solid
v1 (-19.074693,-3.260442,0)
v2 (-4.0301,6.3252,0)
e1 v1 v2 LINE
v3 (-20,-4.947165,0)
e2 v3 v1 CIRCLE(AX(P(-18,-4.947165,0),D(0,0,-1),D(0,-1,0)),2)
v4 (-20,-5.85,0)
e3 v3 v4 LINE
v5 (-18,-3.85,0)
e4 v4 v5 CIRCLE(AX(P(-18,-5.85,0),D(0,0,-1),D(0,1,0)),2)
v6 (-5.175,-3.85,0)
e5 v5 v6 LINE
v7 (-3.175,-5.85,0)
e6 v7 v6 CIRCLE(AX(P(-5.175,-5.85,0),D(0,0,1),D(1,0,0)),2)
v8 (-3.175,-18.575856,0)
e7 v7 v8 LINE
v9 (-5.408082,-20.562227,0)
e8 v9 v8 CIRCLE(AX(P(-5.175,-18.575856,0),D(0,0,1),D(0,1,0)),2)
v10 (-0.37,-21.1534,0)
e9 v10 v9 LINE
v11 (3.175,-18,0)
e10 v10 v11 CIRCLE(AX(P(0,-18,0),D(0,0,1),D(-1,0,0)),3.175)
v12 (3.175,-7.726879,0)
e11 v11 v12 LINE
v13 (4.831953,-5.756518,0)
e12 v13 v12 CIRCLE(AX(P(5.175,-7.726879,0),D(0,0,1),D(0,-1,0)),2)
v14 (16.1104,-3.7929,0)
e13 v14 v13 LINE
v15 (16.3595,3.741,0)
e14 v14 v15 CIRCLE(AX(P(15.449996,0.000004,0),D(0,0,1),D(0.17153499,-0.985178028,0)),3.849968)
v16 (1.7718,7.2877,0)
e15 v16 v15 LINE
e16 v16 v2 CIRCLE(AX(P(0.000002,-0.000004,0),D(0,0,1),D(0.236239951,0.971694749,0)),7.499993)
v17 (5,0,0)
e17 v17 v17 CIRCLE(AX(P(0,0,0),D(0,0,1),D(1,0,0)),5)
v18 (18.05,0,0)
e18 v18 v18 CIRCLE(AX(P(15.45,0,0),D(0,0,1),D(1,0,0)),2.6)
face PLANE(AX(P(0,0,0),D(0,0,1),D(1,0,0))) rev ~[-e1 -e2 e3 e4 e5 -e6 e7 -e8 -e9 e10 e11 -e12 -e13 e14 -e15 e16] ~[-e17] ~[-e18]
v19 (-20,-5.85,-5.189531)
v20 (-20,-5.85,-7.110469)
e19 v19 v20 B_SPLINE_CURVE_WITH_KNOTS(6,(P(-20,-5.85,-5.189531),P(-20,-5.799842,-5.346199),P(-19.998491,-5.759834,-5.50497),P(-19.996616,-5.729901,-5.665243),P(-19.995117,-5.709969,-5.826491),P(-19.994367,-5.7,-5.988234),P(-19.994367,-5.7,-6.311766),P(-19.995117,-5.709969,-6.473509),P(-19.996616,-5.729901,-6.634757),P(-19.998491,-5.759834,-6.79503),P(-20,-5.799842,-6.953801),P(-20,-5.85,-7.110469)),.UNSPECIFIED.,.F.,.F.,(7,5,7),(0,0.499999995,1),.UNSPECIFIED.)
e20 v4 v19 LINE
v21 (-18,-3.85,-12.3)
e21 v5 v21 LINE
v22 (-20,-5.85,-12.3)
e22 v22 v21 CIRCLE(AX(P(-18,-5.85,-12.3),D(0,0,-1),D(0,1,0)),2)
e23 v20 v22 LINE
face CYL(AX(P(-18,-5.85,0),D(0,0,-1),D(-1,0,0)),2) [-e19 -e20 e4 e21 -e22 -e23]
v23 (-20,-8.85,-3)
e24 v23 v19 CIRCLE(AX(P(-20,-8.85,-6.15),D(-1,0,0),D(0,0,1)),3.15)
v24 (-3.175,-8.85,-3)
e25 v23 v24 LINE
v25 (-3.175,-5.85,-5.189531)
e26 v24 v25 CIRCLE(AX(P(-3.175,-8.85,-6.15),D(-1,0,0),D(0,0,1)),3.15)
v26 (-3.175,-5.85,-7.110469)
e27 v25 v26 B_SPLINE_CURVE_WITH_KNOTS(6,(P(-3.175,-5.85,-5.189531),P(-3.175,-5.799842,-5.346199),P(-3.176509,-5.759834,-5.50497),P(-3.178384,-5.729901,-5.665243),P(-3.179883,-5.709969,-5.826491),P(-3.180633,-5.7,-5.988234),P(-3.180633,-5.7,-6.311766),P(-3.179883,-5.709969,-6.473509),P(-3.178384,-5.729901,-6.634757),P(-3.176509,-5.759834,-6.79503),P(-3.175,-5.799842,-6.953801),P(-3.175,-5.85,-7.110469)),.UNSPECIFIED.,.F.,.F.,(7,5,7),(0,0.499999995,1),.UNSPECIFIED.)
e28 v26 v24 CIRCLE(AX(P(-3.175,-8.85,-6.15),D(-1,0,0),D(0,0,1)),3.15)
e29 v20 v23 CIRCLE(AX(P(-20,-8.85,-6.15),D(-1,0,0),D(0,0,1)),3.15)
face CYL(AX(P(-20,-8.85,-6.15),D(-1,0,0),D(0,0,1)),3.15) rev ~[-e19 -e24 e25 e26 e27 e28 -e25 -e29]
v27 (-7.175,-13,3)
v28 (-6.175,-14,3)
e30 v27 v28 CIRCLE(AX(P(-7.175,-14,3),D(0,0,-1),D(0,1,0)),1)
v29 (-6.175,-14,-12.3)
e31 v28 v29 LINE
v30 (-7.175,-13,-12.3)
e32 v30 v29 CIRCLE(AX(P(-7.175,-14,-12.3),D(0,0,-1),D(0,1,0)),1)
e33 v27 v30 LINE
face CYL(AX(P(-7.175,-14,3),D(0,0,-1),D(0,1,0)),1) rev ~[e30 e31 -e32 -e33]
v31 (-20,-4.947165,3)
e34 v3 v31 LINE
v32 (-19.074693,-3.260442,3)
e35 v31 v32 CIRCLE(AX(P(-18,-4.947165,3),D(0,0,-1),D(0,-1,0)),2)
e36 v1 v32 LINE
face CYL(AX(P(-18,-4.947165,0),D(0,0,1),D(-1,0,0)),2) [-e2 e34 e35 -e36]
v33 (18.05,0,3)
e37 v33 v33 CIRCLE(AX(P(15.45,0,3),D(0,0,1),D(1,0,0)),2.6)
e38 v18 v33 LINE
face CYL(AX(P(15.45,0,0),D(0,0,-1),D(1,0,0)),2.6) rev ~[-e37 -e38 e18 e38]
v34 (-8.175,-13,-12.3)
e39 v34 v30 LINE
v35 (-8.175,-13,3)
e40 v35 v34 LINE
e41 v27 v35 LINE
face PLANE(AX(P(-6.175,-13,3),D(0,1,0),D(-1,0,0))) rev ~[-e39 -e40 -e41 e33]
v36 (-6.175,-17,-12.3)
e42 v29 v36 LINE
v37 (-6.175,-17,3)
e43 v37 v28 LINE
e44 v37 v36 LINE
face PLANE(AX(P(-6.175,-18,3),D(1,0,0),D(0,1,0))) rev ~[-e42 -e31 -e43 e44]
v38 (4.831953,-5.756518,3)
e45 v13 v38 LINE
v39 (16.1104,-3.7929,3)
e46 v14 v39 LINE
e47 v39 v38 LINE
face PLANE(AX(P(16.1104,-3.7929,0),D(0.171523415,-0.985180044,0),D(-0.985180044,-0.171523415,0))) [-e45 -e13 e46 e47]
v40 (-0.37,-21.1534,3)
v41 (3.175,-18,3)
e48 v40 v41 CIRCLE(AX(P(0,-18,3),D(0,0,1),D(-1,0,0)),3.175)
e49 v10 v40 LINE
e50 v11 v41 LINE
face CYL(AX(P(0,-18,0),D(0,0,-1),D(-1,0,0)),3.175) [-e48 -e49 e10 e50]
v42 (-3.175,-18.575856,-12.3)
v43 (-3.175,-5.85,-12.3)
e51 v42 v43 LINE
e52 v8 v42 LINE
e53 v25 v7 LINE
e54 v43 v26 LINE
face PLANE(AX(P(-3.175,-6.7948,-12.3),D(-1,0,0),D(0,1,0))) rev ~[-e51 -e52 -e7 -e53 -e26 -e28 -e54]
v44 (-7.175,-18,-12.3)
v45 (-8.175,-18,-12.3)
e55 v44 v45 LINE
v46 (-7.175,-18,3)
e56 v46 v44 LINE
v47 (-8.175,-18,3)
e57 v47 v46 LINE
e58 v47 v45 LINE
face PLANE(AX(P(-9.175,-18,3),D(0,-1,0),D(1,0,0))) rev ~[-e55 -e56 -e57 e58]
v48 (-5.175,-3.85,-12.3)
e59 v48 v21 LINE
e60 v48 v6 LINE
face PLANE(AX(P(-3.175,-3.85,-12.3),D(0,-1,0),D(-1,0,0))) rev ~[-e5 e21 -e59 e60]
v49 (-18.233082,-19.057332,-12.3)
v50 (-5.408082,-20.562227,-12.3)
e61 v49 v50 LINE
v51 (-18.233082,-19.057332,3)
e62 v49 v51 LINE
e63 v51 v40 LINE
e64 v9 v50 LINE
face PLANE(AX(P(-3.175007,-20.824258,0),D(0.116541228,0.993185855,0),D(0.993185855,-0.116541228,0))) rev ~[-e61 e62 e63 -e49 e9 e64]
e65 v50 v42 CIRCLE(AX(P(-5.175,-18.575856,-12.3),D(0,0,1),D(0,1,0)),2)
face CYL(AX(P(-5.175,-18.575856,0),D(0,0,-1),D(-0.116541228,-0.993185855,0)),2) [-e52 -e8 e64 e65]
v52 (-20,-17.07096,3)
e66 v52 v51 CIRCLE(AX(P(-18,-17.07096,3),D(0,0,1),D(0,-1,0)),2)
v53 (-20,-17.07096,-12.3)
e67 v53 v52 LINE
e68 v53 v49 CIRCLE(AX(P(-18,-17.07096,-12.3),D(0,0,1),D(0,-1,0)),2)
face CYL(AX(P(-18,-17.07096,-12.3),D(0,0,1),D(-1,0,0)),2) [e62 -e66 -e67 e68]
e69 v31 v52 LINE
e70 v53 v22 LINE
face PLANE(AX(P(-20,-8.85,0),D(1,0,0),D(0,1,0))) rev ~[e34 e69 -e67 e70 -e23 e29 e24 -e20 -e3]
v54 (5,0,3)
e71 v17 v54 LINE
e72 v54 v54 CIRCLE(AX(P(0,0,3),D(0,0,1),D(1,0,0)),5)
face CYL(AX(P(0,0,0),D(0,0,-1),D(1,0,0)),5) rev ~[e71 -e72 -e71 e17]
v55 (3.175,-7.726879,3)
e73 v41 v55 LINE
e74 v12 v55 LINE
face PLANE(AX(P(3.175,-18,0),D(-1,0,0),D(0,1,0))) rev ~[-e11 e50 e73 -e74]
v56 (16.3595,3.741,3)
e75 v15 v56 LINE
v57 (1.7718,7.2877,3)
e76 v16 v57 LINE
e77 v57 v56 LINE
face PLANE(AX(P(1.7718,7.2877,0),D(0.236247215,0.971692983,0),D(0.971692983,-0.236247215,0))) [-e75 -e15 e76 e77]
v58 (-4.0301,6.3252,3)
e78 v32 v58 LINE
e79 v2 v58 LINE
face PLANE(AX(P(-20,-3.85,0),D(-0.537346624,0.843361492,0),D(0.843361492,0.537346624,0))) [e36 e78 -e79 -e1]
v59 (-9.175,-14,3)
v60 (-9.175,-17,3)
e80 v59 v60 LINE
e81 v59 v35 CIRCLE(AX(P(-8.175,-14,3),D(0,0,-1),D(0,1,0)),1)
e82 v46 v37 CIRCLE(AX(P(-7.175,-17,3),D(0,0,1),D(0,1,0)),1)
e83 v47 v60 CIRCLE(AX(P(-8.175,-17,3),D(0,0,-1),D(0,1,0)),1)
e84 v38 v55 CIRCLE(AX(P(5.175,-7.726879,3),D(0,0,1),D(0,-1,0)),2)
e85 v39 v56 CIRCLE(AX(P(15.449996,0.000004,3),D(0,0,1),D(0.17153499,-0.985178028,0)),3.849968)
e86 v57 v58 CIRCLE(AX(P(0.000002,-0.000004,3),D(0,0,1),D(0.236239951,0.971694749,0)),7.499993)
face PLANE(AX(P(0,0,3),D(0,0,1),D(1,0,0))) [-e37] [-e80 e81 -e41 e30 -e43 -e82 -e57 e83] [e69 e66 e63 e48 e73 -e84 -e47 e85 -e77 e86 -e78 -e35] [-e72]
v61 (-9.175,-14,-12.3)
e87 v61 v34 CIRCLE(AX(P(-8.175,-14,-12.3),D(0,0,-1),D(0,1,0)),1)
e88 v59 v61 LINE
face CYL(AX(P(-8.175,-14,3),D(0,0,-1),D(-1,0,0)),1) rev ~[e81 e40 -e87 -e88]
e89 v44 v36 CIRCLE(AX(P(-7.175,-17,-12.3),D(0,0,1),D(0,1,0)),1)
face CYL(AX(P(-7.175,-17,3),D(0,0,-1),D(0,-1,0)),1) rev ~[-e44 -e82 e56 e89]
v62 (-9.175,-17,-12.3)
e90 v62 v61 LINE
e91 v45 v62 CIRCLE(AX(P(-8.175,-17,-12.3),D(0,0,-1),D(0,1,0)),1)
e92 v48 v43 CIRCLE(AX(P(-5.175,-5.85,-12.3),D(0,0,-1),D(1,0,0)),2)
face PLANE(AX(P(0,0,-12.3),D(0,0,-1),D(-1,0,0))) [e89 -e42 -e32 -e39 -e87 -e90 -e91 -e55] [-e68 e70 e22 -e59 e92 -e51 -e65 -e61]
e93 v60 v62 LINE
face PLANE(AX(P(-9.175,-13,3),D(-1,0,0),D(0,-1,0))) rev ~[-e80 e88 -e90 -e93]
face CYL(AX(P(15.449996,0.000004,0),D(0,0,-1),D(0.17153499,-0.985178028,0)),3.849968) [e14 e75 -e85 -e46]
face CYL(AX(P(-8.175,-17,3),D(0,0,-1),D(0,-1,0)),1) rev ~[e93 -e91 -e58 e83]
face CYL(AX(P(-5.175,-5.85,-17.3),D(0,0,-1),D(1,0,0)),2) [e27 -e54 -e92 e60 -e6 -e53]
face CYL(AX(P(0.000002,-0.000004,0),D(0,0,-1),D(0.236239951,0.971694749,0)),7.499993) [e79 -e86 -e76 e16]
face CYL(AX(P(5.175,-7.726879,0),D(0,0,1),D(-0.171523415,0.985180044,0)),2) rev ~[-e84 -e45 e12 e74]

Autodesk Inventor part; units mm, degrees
ref_plane "YZ Plane" through (0, 0, 0) normal (1, 0, 0) x (0, 1, 0)
ref_plane "XZ Plane" through (0, 0, 0) normal (0, 1, 0) x (-1, 0, 0)
ref_plane "XY Plane" through (0, 0, 0) normal (0, 0, 1) x (1, 0, 0)
sketch "Sketch1" plane through (0, 0, 0) normal (0, 0, 1) x (1, 0, 0)
  circle A0 centre (0, 0) radius 5
  circle A1 centre (15.45, 0) radius 2.6
  arc A2 (16.1104, -3.7929) -> (16.3595, 3.741) centre (15.45, 0) ccw
  arc A3 (1.7718, 7.2877) -> (-3.175, -6.7948) centre (0, 0) ccw
  line L0 (1.7718, 7.2877) -> (16.3595, 3.741)
  arc A4 (-3.175, -18) -> (3.175, -18) centre (0, -18) ccw
  line L1 (3.175, -18) -> (3.175, -6.045)
  line L2 (-3.175, -6.7948) -> (-3.175, -18)
  line L3 (-20, -8.85) -> (-20, -3.85)
  line L4 (-20, -8.85) -> (-20, -18.85)
  line L5 (-20, -3.85) -> (-4.0301, 6.3252)
  line L6 (-20, -3.85) -> (-6.4364, -3.85)
  line L7 (-20, -18.85) -> (-0.37, -21.1534)
  line L8 (16.1104, -3.7929) -> (3.175, -6.045)
  line L9 (-3.175, -18) -> (-3.175, -20.8242)
  point P0 (-20, -5.6718)
  dimension "d0" = 15.45
  dimension "d1" = 5.2
  dimension "d2" = 10
  dimension "d3" = 0
  dimension "d4" = 7.7
  dimension "d5" = 15
  dimension "d6" = 6.35
  dimension "d7" = 0
  dimension "d9" = 18
  dimension "d21" = 8.85
  dimension "d22" = 20
  dimension "d23" = 5
  dimension "d24" = 10
extrude "Extrusion3" add sketch "Sketch1" along normal blind 3
fillet "Fillet7" radius 2 1 edges at (3.175, -6.045, 1.5)
extrude "Extrusion6" add sketch "Sketch1" against normal blind 12.3 contours A3 L2 L9 L7 L4 L3 L6
sketch "Sketch5" plane through (-20, -18.85, 3) normal (-1, 0, 0) x (0, 0, 1)
  line L0 (-3, 26.35) -> (0, 26.35) projected
  line L1 (0, 15) -> (0, 0) projected
  circle A0 centre (-9.15, 10) radius 3.15
  line L2 (-3, -1.9742) -> (-3, 12.0552) projected
  point P0 (-3, 18.85)
  point P1 (-3, 13.1782)
  point P2 (-3, 10)
  dimension "d43" = 6.3
  dimension "d44" = 0
  dimension "d45" = 6.15
sketch "Sketch6" plane through (0, 0, 3) normal (0, 0, 1) x (1, 0, 0)
  line L0 (-20, -12) -> (-3.175, -12) projected
  circle A0 centre (0, 0) radius 5 projected
  circle A1 centre (15.45, 0) radius 2.6 projected
  line L1 (-4.0301, 6.3252) -> (-20, -3.85) projected
  line L2 (-20, -3.85) -> (-20, -18.85) projected
  line L3 (-20, -18.85) -> (-0.37, -21.1534) projected
  arc A2 (-0.37, -21.1534) -> (3.175, -18) centre (0, -18) ccw projected
  line L4 (3.175, -18) -> (3.175, -7.7269) projected
  arc A3 (4.832, -5.7565) -> (3.175, -7.7269) centre (5.175, -7.7269) ccw projected
  line L5 (4.832, -5.7565) -> (16.1104, -3.7929) projected
  arc A4 (16.1104, -3.7929) -> (16.3595, 3.741) centre (15.45, 0) ccw projected
  line L6 (16.3595, 3.741) -> (1.7718, 7.2877) projected
  arc A5 (1.7718, 7.2877) -> (-4.0301, 6.3252) centre (0, 0) ccw projected
  line L7 (-20, -5.7) -> (-4.8744, -5.7) projected
  line L8 (-3.175, -20.8242) -> (-3.175, -6.7948) projected
  line L9 (-3.175, -6.7948) -> (-3.175, -20.8242) projected
  line L10 (-9.175, -18) -> (-6.175, -18)
  line L11 (-6.175, -18) -> (-6.175, -13)
  line L12 (-6.175, -13) -> (-9.175, -13)
  line L13 (-9.175, -13) -> (-9.175, -18)
  dimension "d55" = 5
  dimension "d56" = 3
  dimension "d57" = 3
  dimension "d58" = 1
extrude "Extrusion8" cut sketch "Sketch6" against normal up to next contours L13 L12 L11 L10
fillet "Fillet8" radius 2 1 edges at (-20, -18.85, -4.65)
fillet "Fillet9" radius 2 1 edges at (-20, -3.85, -6.15)
fillet "Fillet10" radius 1 1 edges at (-6.175, -18, -4.65)
fillet "Fillet11" radius 1 1 edges at (-9.175, -18, -4.65)
fillet "Fillet12" radius 1 1 edges at (-9.175, -13, -4.65)
fillet "Fillet13" radius 1 1 edges at (-6.175, -13, -4.65)
fillet "Fillet14" radius 2 1 edges at (-3.175, -20.8242, -6.15)
fillet "Fillet18" radius 2 1 edges at (-20, -3.85, 1.5)
sketch "Sketch8" plane through (0, 0, -12.3) normal (0, 0, -1) x (-1, 0, 0)
  line L0 (18, -3.85) -> (6.4364, -3.85) projected
  line L1 (6.175, -17) -> (6.175, -14) projected
  arc A0 (7.175, -13) -> (6.175, -14) centre (7.175, -14) ccw projected
  line L2 (7.175, -13) -> (8.175, -13) projected
  arc A1 (9.175, -14) -> (8.175, -13) centre (8.175, -14) ccw projected
  line L3 (9.175, -14) -> (9.175, -17) projected
  arc A2 (8.175, -18) -> (9.175, -17) centre (8.175, -17) ccw projected
  line L4 (8.175, -18) -> (7.175, -18) projected
  arc A3 (6.175, -17) -> (7.175, -18) centre (7.175, -17) ccw projected
  arc A4 (3.175, -18.5758) -> (5.4081, -20.5622) centre (5.175, -18.5758) ccw projected
  line L5 (5.4081, -20.5622) -> (18.2331, -19.0573) projected
  arc A5 (18.2331, -19.0573) -> (20, -17.071) centre (18, -17.071) ccw projected
  line L6 (20, -17.071) -> (20, -5.85) projected
  arc A6 (20, -5.85) -> (18, -3.85) centre (18, -5.85) ccw projected
  line L7 (18, -3.85) -> (6.4364, -3.85) projected
  arc A7 (3.175, -6.7948) -> (6.4364, -3.85) centre (0, 0) ccw projected
  line L8 (3.175, -6.7948) -> (3.175, -18.5758) projected
  line L9 (19.9944, -5.7) -> (4.8744, -5.7) projected
  circle A8 centre (0, 0) radius 7.5
  line L10 (3.175, -6.7948) -> (3.175, -3.85)
  line L11 (3.175, -3.85) -> (6.4364, -3.85)
extrude "Extrusion9" add sketch "Sketch8" against normal up to surface (12.3 mm away) contours A7 L10 L11
extrude "Extrusion10" cut sketch "Sketch5" against normal up to next
fillet "Fillet19" radius 2 1 edges at (-3.175, -3.85, -6.15)
properties part number "bowden_tube_holder"
